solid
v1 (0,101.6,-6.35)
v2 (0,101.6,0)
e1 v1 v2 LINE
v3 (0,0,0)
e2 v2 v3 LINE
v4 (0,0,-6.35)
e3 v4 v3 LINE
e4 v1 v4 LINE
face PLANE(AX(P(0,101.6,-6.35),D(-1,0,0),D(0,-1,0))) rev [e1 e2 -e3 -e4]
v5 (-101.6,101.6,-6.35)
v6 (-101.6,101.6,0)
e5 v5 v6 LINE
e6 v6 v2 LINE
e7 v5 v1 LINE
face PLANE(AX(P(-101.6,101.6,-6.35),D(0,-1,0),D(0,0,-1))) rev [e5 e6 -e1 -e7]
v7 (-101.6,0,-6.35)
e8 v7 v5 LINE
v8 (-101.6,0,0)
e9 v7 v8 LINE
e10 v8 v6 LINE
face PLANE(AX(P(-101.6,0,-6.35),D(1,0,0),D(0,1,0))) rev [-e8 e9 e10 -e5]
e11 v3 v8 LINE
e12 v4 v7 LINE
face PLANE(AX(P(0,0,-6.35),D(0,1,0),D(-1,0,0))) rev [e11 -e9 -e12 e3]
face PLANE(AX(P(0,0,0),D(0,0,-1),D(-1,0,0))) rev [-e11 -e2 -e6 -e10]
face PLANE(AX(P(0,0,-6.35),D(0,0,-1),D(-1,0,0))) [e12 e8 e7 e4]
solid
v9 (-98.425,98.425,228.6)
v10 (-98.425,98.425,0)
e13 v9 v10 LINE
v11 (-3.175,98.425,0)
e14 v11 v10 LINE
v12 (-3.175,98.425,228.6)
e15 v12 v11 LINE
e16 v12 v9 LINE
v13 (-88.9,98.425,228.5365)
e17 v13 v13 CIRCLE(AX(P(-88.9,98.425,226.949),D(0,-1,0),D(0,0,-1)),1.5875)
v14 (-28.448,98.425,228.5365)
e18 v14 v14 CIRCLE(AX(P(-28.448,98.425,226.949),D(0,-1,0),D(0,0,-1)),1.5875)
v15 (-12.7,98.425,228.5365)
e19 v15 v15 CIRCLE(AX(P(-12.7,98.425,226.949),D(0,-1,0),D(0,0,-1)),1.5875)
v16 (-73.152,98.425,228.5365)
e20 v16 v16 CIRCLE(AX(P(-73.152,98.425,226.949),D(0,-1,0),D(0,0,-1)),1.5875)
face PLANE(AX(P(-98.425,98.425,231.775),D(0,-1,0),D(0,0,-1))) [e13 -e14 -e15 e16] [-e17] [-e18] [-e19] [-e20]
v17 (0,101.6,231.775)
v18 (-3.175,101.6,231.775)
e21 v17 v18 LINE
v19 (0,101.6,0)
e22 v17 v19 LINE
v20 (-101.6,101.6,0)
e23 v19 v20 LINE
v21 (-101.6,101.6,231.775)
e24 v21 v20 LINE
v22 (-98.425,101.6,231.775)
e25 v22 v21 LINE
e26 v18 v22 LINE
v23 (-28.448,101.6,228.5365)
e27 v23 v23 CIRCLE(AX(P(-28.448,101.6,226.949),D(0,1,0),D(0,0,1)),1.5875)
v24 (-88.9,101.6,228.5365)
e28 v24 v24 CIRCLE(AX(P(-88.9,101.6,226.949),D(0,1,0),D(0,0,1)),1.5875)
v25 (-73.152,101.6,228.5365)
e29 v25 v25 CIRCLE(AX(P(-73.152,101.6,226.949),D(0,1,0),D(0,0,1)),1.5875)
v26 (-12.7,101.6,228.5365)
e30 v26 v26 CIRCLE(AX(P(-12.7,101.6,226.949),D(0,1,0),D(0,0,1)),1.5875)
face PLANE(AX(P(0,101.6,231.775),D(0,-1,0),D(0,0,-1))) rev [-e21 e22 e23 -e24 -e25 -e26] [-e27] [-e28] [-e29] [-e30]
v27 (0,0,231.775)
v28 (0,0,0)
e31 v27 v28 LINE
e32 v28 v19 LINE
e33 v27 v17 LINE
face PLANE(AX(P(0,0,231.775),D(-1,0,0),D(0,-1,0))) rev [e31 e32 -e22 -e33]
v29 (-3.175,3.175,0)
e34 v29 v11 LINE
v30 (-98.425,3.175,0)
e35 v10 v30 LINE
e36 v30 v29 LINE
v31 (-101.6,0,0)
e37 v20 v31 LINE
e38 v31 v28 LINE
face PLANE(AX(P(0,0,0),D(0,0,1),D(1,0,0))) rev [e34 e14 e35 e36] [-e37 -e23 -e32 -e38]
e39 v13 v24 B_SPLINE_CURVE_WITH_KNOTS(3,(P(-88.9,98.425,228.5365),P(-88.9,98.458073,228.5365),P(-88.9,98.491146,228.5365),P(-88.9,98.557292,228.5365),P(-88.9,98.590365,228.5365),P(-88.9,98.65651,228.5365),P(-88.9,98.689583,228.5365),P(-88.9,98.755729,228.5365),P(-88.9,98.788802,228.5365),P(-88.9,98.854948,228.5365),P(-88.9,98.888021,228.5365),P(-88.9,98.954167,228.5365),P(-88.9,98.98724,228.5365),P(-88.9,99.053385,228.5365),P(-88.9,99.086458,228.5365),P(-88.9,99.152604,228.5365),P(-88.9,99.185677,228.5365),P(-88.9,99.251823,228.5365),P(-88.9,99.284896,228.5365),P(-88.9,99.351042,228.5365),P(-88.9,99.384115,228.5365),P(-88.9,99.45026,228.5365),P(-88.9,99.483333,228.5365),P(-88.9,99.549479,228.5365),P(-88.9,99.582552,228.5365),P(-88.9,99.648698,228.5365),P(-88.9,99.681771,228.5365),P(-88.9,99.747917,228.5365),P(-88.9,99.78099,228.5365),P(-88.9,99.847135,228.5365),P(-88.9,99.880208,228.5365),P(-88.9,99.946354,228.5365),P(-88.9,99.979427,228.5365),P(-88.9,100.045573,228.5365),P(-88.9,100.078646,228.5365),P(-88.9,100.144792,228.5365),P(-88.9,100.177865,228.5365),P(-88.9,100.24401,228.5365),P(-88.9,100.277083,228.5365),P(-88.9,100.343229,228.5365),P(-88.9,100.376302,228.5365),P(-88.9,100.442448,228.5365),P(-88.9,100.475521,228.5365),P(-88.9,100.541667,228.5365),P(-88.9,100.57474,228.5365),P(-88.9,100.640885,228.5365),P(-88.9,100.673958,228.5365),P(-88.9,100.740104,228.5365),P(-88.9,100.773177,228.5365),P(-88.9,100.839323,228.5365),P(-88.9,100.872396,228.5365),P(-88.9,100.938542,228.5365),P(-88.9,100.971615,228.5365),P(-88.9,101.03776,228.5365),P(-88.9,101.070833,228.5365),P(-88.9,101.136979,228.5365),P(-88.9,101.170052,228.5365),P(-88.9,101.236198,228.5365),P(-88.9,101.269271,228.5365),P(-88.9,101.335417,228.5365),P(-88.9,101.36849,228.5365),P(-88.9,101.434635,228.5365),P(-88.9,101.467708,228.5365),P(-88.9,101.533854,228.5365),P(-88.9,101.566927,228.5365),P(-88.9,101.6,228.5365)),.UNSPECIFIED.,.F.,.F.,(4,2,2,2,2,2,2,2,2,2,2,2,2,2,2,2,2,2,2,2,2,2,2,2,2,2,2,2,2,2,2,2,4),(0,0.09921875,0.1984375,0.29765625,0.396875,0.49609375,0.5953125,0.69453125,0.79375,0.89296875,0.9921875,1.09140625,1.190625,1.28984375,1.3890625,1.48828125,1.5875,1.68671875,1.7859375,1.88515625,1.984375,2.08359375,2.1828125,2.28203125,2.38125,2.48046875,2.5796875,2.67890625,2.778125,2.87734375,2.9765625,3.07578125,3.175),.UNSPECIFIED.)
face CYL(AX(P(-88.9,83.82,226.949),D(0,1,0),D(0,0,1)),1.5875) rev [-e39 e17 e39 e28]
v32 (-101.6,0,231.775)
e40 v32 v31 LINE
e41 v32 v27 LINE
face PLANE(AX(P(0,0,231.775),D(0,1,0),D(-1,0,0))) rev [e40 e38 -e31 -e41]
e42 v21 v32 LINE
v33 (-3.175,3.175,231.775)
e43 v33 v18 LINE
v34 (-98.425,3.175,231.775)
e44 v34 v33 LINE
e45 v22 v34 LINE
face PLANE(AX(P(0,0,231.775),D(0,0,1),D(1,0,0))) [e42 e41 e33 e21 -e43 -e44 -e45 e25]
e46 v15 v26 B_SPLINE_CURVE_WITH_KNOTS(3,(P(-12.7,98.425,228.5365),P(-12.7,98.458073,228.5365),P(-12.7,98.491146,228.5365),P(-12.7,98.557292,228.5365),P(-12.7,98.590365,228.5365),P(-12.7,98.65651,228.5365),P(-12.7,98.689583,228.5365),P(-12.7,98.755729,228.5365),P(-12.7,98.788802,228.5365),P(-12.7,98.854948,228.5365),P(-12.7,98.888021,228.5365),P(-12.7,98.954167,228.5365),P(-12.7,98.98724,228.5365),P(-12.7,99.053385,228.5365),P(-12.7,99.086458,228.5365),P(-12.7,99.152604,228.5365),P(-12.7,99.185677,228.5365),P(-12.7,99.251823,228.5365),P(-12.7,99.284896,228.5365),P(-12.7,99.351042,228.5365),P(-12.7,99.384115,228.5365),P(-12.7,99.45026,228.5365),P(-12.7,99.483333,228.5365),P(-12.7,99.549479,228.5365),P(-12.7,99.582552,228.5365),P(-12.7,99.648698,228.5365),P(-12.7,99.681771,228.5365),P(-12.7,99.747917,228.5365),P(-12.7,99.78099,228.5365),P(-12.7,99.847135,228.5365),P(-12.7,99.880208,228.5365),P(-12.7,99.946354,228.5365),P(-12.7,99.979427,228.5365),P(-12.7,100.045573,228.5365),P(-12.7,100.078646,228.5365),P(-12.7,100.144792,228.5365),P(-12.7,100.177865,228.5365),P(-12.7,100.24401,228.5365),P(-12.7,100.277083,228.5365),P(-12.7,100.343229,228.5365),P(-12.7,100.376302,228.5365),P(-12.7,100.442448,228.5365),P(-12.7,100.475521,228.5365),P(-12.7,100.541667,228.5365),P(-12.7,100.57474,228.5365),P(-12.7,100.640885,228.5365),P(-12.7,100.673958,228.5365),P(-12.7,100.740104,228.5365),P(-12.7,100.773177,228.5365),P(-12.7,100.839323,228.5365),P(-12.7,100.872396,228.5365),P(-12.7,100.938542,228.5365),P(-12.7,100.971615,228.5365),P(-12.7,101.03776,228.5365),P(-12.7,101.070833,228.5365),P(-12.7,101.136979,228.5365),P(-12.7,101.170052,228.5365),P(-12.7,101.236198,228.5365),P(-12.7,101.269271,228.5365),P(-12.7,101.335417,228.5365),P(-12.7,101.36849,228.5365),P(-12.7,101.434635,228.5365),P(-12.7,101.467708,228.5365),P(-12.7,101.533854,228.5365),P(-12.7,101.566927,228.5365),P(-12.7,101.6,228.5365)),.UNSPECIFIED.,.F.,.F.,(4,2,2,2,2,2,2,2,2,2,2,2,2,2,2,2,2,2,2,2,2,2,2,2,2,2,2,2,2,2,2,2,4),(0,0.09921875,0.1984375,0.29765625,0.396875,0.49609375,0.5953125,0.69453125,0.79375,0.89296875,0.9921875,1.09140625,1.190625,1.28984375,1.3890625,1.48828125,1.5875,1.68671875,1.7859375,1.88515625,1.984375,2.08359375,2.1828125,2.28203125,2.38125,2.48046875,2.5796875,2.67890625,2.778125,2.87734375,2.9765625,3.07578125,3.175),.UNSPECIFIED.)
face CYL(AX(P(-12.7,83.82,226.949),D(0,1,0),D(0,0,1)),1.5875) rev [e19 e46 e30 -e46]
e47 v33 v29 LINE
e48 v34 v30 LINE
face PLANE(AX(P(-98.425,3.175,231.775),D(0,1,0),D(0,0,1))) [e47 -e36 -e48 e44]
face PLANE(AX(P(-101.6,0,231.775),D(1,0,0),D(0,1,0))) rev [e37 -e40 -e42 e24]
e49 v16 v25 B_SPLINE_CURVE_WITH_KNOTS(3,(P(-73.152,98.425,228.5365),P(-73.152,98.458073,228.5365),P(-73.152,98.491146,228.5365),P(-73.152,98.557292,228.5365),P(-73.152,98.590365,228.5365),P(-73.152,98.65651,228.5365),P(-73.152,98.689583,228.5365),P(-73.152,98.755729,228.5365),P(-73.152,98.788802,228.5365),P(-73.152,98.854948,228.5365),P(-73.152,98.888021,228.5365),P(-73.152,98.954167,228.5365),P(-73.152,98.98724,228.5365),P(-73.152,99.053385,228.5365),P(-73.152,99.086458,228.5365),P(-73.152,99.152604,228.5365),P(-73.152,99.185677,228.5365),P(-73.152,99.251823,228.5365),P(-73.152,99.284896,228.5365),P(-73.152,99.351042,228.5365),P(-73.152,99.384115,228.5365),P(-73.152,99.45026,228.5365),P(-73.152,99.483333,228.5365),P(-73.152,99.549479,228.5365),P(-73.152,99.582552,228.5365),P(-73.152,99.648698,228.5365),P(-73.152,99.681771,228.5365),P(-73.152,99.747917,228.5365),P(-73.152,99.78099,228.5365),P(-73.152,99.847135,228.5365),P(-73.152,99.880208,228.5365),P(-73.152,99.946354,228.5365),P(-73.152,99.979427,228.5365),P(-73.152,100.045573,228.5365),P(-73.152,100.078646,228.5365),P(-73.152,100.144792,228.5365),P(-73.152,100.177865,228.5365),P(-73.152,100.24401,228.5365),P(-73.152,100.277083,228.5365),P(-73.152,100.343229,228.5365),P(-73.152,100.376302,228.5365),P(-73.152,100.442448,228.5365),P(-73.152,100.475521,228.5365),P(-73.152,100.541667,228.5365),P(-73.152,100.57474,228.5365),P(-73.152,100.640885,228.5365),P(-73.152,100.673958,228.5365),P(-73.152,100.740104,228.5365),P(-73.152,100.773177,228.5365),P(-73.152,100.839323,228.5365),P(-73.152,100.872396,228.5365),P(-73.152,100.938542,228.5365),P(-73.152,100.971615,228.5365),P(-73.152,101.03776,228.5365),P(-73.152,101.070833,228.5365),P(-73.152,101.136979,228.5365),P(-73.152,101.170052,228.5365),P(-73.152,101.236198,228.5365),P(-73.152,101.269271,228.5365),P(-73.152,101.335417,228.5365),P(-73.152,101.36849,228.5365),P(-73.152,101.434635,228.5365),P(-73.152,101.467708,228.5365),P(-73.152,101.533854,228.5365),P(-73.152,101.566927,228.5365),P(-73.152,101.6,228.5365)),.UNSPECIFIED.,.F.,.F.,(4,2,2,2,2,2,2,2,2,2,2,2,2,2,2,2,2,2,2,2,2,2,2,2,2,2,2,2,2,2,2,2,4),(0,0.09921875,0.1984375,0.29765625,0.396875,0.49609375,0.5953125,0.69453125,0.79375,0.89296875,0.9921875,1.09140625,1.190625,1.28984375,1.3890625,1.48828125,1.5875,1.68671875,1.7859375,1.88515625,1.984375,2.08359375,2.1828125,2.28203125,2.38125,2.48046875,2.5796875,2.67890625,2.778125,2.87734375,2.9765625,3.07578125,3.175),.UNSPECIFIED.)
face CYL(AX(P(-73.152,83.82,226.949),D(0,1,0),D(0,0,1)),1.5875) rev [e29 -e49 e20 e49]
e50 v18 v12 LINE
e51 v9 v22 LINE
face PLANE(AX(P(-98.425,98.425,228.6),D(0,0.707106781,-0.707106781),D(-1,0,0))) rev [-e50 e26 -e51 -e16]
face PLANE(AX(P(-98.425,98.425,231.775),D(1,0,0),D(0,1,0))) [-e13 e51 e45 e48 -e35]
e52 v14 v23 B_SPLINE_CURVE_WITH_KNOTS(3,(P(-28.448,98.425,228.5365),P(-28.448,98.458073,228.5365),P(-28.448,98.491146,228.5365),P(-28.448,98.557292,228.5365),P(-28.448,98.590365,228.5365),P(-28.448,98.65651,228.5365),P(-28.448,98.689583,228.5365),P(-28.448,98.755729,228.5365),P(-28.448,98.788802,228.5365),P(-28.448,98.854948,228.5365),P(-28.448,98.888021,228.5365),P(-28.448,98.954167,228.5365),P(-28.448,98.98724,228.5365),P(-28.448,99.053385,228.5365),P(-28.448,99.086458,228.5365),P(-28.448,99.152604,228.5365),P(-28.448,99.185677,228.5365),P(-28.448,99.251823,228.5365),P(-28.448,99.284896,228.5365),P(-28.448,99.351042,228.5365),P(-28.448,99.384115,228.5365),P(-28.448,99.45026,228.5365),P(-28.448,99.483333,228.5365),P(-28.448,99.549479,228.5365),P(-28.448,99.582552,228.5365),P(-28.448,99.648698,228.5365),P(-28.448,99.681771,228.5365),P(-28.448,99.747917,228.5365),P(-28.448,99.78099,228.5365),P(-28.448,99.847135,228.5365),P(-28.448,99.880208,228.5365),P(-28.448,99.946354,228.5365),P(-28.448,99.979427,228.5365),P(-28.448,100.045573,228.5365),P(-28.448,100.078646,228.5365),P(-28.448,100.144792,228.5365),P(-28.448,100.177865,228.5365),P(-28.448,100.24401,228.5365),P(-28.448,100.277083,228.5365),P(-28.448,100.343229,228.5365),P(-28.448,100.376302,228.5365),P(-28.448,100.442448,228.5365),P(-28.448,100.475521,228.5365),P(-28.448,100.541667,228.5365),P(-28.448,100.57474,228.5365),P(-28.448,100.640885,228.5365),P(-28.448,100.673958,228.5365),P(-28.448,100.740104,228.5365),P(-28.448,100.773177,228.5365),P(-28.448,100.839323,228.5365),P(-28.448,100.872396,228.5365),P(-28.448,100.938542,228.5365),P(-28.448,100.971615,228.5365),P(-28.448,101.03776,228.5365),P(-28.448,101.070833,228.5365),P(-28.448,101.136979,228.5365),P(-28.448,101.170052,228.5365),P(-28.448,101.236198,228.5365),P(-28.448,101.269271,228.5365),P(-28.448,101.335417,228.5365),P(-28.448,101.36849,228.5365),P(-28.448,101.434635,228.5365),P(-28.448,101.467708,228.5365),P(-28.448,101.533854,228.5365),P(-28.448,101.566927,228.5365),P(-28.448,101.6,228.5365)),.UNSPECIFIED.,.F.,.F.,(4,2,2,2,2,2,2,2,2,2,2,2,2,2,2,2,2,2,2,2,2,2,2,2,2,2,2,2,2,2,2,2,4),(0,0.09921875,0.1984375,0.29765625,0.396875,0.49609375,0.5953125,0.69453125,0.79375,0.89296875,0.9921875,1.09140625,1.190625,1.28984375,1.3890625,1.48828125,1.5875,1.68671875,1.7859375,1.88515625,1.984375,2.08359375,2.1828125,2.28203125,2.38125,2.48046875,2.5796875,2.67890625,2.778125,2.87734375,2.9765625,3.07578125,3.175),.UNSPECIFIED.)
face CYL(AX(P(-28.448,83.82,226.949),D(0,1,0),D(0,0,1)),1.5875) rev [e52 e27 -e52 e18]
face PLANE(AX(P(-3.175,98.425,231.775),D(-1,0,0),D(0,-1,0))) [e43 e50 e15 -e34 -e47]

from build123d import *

# Parameters (mm, degrees)
SKETCH1_W           = 101.6
SKETCH1_H           = 101.6
SKETCH1_W_2         = 95.25
SKETCH1_H_2         = 95.25
BOSS_EXTRUDE1_DEPTH = 231.775
SKETCH2_W           = 101.6
SKETCH2_H           = 101.6
BOSS_EXTRUDE2_DEPTH = 6.35
CHAMFER1_SIZE       = 3.175
SKETCH3_R           = 1.5875
CUT_EXTRUDE1_DEPTH  = 17.78


with BuildPart() as part:
    # Sketch1 → Boss-Extrude1 (new body)
    with BuildSketch(Plane.XY):
        with Locations((-50.8, 50.8)):
            Rectangle(SKETCH1_W, SKETCH1_H)
        with Locations((-50.8, 50.8)):
            Rectangle(SKETCH1_W_2, SKETCH1_H_2, mode=Mode.SUBTRACT)
    extrude(amount=BOSS_EXTRUDE1_DEPTH)

    # Chamfer1
    chamfer1_edges = [part.edges().sort_by_distance(p)[0] for p in [
        (-50.8, 98.425, 231.775),
    ]]
    chamfer(chamfer1_edges, length=CHAMFER1_SIZE - 0.0001)  # a hair under: the kernel refuses the full size

    # Sketch3 → Cut-Extrude1 (cut)
    with BuildSketch(Plane(origin=(0, 101.6, 0), x_dir=(1, 0, 0), z_dir=(0, 1, 0))):
        with Locations(Location((-88.9, -226.949, 0), (0, 0, 270))):
            Circle(SKETCH3_R)
        with Locations(Location((-73.152, -226.949, 0), (0, 0, 270))):
            Circle(SKETCH3_R)
        with Locations(Location((-28.448, -226.949, 0), (0, 0, 270))):
            Circle(SKETCH3_R)
        with Locations(Location((-12.7, -226.949, 0), (0, 0, 270))):
            Circle(SKETCH3_R)
    extrude(amount=-CUT_EXTRUDE1_DEPTH, mode=Mode.SUBTRACT)


with BuildPart() as body_2:
    # Sketch2 → Boss-Extrude2 (new body)
    with BuildSketch(Plane(origin=(0, 0, 0), x_dir=(-1, 0, 0), z_dir=(0, 0, -1))):
        with Locations((50.8, 50.8)):
            Rectangle(SKETCH2_W, SKETCH2_H)
    extrude(amount=BOSS_EXTRUDE2_DEPTH)


solid = Compound([part.part, body_2.part])
